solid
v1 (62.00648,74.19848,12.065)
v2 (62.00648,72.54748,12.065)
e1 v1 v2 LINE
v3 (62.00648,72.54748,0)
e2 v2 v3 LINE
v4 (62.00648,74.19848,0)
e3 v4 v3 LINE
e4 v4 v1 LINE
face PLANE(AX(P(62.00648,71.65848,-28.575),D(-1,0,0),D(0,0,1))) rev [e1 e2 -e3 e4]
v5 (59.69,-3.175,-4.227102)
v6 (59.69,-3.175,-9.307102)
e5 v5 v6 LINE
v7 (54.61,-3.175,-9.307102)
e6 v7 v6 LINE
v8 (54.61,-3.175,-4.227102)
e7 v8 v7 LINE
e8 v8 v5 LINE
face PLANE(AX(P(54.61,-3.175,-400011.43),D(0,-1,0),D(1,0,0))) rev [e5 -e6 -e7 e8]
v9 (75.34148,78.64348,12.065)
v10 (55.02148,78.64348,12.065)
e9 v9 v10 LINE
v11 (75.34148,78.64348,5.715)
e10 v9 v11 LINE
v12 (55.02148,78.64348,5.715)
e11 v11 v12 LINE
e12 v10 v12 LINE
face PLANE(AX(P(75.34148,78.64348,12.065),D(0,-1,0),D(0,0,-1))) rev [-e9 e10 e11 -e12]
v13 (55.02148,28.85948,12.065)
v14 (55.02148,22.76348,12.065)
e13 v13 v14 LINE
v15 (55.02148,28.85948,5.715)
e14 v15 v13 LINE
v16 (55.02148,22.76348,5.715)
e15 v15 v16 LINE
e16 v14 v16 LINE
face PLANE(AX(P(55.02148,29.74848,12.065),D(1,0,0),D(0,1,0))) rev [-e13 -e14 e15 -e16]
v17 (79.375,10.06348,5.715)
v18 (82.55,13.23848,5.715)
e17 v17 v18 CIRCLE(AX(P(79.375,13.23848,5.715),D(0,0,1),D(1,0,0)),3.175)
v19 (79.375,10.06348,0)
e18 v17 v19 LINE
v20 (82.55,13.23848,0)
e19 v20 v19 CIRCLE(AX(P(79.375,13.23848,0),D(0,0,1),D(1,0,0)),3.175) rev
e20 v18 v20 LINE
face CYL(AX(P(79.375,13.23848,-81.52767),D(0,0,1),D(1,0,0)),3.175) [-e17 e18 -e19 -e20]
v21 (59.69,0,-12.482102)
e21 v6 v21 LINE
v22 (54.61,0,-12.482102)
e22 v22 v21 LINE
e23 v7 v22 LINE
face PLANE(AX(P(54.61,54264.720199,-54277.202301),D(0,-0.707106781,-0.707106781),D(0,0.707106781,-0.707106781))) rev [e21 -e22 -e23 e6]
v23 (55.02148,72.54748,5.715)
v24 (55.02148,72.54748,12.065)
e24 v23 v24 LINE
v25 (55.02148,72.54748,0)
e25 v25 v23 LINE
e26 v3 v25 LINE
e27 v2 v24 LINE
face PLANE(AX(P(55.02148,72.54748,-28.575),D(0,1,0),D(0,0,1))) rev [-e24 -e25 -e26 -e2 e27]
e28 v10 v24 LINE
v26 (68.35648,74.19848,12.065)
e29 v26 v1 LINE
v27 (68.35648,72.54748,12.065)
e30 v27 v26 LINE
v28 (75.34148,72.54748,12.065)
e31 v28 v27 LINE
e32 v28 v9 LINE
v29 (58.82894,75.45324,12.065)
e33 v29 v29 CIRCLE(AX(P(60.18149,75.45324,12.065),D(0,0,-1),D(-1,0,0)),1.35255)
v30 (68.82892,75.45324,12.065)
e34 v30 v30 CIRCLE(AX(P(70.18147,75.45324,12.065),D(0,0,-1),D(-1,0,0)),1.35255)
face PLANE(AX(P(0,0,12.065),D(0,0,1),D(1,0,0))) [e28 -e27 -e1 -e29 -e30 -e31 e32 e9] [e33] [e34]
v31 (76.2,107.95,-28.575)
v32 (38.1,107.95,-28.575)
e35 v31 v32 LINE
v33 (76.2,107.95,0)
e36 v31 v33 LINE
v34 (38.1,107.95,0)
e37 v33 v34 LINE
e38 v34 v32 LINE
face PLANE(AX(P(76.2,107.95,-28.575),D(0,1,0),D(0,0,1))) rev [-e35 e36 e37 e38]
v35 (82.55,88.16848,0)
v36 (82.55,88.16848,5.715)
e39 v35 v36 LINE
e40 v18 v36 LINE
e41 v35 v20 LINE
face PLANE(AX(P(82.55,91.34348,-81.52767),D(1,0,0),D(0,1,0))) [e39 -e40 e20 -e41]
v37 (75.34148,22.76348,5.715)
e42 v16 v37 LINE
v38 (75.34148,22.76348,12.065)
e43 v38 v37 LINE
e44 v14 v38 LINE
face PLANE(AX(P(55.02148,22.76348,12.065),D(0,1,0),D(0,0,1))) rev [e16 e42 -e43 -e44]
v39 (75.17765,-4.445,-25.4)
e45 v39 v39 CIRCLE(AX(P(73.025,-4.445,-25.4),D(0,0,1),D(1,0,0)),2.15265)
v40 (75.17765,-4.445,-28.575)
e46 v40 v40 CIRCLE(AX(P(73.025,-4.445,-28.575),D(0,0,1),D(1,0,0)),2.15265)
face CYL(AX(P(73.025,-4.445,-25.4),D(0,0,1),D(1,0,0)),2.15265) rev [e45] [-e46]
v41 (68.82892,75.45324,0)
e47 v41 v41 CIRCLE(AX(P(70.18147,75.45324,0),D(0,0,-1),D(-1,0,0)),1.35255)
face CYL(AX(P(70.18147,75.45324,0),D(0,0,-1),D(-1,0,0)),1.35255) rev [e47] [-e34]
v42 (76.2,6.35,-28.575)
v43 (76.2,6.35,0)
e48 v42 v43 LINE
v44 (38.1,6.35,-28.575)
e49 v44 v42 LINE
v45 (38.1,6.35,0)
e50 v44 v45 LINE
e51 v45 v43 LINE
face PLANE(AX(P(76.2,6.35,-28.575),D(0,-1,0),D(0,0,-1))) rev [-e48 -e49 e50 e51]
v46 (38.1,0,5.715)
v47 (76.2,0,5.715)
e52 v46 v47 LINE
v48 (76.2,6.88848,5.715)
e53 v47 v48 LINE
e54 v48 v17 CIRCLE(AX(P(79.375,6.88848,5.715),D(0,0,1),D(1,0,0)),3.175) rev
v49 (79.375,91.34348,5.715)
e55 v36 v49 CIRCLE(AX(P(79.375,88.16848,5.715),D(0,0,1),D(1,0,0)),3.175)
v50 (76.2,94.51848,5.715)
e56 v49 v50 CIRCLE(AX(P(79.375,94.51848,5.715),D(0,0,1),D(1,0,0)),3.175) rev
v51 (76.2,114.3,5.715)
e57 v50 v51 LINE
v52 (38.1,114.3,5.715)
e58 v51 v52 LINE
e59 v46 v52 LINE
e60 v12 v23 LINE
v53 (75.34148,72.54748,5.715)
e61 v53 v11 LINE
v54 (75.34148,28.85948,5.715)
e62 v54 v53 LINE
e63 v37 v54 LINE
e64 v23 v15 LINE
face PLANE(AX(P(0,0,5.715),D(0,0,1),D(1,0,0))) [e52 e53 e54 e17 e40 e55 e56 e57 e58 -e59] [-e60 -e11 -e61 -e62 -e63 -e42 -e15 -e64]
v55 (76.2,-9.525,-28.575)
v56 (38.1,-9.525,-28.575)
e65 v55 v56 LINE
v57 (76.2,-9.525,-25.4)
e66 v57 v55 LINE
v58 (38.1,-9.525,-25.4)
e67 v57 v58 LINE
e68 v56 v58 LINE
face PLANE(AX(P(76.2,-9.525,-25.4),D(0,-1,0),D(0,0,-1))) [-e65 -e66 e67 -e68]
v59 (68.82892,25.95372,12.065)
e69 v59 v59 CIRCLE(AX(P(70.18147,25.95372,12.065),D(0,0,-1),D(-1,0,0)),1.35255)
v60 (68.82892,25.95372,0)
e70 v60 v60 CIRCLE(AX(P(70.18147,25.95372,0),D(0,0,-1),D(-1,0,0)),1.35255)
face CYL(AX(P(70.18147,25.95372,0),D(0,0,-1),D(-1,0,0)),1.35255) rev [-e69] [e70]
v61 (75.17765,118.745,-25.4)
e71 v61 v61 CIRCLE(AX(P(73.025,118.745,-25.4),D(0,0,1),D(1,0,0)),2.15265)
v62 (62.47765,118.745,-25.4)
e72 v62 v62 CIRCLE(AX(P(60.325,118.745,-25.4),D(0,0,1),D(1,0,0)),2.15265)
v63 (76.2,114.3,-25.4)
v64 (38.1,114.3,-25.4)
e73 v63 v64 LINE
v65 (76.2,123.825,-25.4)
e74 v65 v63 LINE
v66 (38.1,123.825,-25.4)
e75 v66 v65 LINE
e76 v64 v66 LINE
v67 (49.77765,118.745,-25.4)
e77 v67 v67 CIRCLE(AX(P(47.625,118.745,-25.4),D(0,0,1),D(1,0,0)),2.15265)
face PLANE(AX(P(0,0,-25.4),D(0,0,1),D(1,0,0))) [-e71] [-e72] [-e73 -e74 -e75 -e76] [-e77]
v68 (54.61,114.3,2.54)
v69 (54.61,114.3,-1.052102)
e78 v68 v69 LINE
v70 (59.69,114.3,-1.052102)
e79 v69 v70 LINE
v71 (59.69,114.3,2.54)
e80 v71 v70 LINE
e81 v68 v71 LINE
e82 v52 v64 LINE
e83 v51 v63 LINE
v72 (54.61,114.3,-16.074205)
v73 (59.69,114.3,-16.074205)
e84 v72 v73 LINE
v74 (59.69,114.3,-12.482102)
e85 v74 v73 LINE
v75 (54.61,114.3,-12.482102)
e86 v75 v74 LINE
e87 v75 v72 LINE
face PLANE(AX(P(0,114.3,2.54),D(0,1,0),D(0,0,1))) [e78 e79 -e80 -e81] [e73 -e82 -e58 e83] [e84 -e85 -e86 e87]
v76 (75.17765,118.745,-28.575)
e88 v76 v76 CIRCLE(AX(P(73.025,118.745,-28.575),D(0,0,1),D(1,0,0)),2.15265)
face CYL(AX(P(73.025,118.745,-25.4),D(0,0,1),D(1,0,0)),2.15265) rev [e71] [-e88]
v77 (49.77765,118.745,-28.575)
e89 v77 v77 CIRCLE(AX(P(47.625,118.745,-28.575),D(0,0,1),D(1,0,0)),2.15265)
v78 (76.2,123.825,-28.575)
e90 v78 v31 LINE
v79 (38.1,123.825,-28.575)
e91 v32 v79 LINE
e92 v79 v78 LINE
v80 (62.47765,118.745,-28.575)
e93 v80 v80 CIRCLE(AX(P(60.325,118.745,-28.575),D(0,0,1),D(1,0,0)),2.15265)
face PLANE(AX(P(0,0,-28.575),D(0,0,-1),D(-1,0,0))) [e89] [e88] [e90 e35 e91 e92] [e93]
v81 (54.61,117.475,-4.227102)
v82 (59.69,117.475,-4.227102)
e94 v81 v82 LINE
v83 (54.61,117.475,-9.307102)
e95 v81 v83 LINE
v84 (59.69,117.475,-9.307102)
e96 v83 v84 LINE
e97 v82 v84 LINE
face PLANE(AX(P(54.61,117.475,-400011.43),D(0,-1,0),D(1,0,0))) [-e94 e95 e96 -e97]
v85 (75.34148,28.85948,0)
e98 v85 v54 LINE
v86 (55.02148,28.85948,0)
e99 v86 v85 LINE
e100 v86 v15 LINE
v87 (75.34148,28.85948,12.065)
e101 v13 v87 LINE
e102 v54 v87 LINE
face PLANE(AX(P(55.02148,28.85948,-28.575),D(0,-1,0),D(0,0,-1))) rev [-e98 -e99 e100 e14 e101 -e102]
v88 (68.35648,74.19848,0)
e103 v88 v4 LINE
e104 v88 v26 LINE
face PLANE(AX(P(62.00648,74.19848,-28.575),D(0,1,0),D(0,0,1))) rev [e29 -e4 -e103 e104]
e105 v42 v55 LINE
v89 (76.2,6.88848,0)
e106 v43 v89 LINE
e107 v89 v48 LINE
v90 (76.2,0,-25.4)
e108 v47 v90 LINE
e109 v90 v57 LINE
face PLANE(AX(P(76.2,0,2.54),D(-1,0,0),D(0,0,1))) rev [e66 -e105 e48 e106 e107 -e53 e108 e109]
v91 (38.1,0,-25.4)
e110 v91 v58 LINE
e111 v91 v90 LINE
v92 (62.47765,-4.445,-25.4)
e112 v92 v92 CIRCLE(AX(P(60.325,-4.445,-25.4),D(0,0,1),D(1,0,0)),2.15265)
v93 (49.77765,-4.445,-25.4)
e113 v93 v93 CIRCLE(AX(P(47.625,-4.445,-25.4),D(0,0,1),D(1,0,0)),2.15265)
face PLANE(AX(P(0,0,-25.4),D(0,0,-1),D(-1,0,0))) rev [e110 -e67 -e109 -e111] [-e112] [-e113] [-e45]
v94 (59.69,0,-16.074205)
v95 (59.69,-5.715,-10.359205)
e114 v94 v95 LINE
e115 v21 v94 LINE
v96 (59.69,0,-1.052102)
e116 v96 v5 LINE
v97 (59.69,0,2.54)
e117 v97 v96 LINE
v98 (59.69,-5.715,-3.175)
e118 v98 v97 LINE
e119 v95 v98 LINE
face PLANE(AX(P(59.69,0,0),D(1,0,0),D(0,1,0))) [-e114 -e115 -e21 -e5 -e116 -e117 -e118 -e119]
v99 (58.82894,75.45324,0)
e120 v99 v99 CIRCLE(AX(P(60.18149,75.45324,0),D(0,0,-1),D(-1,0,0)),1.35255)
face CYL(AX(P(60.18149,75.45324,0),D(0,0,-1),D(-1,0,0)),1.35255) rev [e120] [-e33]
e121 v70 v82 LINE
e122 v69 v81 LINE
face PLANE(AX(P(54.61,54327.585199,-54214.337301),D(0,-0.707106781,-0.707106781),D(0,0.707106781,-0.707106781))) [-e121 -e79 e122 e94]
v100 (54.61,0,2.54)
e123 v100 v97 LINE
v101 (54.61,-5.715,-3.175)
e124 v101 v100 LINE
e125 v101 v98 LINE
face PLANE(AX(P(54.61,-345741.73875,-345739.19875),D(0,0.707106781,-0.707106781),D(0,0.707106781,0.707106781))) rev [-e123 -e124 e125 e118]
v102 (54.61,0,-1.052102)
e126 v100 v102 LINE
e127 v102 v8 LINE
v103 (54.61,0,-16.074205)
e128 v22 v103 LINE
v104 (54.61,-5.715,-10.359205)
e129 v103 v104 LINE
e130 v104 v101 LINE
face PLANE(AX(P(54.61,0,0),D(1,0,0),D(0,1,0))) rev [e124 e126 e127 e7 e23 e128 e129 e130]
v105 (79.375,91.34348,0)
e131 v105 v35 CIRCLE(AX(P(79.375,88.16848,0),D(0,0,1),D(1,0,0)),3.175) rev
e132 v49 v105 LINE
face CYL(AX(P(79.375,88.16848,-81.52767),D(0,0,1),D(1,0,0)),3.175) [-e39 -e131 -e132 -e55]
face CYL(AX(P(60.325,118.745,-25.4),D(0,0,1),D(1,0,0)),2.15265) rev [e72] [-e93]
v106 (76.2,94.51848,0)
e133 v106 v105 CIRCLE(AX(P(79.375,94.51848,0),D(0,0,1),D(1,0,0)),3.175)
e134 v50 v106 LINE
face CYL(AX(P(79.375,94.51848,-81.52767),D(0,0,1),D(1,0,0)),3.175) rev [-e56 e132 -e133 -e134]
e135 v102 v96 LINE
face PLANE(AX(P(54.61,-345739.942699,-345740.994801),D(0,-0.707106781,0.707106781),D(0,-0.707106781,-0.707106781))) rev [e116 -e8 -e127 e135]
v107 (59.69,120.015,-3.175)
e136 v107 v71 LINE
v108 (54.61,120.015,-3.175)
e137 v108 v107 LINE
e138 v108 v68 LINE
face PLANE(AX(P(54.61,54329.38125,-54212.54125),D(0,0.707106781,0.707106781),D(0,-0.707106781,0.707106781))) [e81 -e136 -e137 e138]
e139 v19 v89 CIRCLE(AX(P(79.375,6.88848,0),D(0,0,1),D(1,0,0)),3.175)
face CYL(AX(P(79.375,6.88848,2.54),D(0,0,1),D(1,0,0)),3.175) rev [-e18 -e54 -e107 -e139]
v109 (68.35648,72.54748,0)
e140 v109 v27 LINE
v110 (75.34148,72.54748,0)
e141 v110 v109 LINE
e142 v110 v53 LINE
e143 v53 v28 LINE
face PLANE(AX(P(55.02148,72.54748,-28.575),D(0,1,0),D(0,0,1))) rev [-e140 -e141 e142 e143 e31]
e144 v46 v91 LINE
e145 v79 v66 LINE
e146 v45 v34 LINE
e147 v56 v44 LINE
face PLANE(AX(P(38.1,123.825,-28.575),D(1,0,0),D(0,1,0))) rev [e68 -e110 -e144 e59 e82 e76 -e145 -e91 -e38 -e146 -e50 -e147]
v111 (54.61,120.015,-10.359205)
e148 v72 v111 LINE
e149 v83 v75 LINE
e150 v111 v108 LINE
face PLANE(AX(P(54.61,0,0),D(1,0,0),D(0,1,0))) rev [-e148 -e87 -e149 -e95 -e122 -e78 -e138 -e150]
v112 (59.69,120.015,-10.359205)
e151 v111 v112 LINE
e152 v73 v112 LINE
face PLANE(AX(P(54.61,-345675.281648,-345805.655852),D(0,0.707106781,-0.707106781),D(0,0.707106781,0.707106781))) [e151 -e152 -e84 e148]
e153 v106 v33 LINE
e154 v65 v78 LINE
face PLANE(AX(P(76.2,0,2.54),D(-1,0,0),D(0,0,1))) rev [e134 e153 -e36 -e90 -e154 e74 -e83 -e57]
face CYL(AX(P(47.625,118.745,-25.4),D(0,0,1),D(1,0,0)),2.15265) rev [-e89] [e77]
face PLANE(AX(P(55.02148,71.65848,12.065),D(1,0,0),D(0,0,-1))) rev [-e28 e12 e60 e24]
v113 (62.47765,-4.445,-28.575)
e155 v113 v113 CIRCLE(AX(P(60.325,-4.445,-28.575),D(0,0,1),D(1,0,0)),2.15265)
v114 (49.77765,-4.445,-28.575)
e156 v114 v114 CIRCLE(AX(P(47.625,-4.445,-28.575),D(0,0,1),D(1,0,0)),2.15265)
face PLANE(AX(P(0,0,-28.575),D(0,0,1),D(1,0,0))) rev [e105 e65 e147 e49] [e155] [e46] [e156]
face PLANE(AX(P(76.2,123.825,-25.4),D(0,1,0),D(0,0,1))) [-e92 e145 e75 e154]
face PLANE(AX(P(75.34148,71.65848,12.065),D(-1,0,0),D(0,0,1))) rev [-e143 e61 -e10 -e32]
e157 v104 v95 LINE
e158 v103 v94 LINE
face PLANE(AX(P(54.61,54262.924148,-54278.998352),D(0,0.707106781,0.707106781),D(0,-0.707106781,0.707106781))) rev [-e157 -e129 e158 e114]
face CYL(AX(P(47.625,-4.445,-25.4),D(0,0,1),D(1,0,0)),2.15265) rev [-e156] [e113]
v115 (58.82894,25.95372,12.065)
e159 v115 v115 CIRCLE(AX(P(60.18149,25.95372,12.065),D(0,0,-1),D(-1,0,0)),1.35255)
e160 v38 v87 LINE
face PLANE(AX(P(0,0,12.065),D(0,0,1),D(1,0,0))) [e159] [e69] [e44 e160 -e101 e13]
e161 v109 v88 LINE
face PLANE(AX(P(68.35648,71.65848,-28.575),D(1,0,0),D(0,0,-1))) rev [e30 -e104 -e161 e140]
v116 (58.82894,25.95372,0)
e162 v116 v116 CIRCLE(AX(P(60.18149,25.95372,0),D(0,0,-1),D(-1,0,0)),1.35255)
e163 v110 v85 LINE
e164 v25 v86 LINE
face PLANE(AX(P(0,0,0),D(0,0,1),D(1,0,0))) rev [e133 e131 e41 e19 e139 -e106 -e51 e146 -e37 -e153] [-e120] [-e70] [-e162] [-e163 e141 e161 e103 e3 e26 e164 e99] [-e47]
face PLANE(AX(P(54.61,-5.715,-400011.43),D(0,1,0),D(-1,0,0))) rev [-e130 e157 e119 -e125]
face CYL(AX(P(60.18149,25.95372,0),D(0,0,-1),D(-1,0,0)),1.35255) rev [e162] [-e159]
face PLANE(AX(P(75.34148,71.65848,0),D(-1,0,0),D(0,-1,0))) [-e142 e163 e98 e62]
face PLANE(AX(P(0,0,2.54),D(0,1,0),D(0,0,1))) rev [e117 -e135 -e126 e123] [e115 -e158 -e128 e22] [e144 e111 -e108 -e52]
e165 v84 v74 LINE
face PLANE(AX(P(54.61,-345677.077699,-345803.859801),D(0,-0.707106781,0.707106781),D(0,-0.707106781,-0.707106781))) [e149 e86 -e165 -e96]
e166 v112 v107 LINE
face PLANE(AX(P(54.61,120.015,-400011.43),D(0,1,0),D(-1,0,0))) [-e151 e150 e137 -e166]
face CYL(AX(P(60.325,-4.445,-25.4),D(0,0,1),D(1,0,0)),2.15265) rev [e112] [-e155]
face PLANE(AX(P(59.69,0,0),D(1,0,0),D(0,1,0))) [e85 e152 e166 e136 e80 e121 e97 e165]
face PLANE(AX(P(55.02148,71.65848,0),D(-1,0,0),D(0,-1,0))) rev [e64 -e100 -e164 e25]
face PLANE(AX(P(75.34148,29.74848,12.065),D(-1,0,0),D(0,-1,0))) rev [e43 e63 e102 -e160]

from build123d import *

# Parameters (mm, degrees)
SKETCH1_W             = 76.2
SKETCH1_H             = 114.3
BOSS_EXTRUDE1_DEPTH   = 2.54
SKETCH2_W             = 20.32
SKETCH2_H             = 41.91
CUT_EXTRUDE1_DEPTH    = 138.394983897
SKETCH3_W             = 76.2
SKETCH3_H             = 6.35
BOSS_EXTRUDE2_DEPTH   = 28.575
SKETCH4_W             = 76.2
SKETCH4_H             = 9.525
BOSS_EXTRUDE3_DEPTH   = 3.175
F_6_CLEARANCE_HOLE1_D = 4.3053
SKETCH9_W             = 76.2
SKETCH9_H             = 114.3
SKETCH9_W_2           = 20.32
SKETCH9_H_2           = 41.91
BOSS_EXTRUDE4_DEPTH   = 3.175
SKETCH10_W            = 38.1
SKETCH10_H            = 133.35
CUT_EXTRUDE3_DEPTH    = 150.381641191
SKETCH11_W            = 20.32
SKETCH11_H            = 6.985
BOSS_EXTRUDE5_DEPTH   = 6.35
F_6_32_TAPPED_HOLE1_D = 2.7051
SKETCH15_W            = 6.35
SKETCH15_H            = 2.54
CUT_EXTRUDE4_DEPTH    = 151.965824692
SKETCH16_W            = 20.32
SKETCH16_H            = 43.688
CUT_EXTRUDE5_DEPTH    = 151.965824692
SKETCH17_W            = 6.35
SKETCH17_H            = 81.28
BOSS_EXTRUDE6_DEPTH   = 5.715
FILLET1_START         = -28.575
FILLET1_DEPTH         = 35.575
FILLET1_2_DEPTH       = 5.715
BOSS_EXTRUDE7_START   = -19.05
BOSS_EXTRUDE7_DEPTH   = 2.54


with BuildPart() as part:
    # Sketch1 → Boss-Extrude1 (new body)
    with BuildSketch(Plane.XY):
        with Locations((38.1, 57.15)):
            Rectangle(SKETCH1_W, SKETCH1_H)
    extrude(amount=BOSS_EXTRUDE1_DEPTH)

    # Sketch2 → Cut-Extrude1 (cut, through all)
    with BuildSketch(Plane.XY.offset(2.54)):
        with Locations((65.18148, 50.70348)):
            Rectangle(SKETCH2_W, SKETCH2_H)
    extrude(amount=-CUT_EXTRUDE1_DEPTH, mode=Mode.SUBTRACT)

    # Sketch3 → Boss-Extrude2 (add)
    with BuildSketch(Plane(origin=(0, 0, 0), x_dir=(-1, 0, 0), z_dir=(0, 0, -1))):
        with Locations((-38.1, 111.125)):
            Rectangle(SKETCH3_W, SKETCH3_H)
        with Locations((-38.1, 3.175)):
            Rectangle(SKETCH3_W, SKETCH3_H)
    extrude(amount=BOSS_EXTRUDE2_DEPTH)

    # Sketch4 → Boss-Extrude3 (add)
    with BuildSketch(Plane(origin=(0, 0, -28.575), x_dir=(-1, 0, 0), z_dir=(0, 0, -1))):
        with Locations((-38.1, 119.0625)):
            Rectangle(SKETCH4_W, SKETCH4_H)
        with Locations((-38.1, -4.7625)):
            Rectangle(SKETCH4_W, SKETCH4_H)
    extrude(amount=-BOSS_EXTRUDE3_DEPTH)

    # #6 Clearance Hole1 (through all)
    with Locations(Plane.XY.offset(-25.4)):
        with Locations((9.525, 118.745), (9.525, -4.445), (22.225, -4.445), (34.925, -4.445), (47.625, -4.445), (60.325, -4.445), (22.225, 118.745), (73.025, -4.445), (34.925, 118.745), (47.625, 118.745), (60.325, 118.745), (73.025, 118.745)):
            Hole(F_6_CLEARANCE_HOLE1_D / 2)

    # Sketch9 → Boss-Extrude4 (add)
    with BuildSketch(Plane.XY.offset(2.54)):
        with Locations((38.1, 57.15)):
            Rectangle(SKETCH9_W, SKETCH9_H)
        with Locations((65.18148, 50.70348)):
            Rectangle(SKETCH9_W_2, SKETCH9_H_2, mode=Mode.SUBTRACT)
    extrude(amount=BOSS_EXTRUDE4_DEPTH)

    # Sketch10 → Cut-Extrude3 (cut, through all)
    with BuildSketch(Plane.XY.offset(5.715)):
        with Locations((19.05, 57.15)):
            Rectangle(SKETCH10_W, SKETCH10_H)
    extrude(amount=-CUT_EXTRUDE3_DEPTH, mode=Mode.SUBTRACT)

    # Sketch11 → Boss-Extrude5 (add)
    with BuildSketch(Plane.XY.offset(5.715)):
        with Locations((65.18148, 75.15098)):
            Rectangle(SKETCH11_W, SKETCH11_H)
        with Locations((65.18148, 26.25598)):
            Rectangle(SKETCH11_W, SKETCH11_H)
    extrude(amount=BOSS_EXTRUDE5_DEPTH)

    # #6-32 Tapped Hole1 (through all)
    with Locations(Plane(origin=(0, 0, 0), x_dir=(-1, 0, 0), z_dir=(0, 0, -1))):
        with Locations((-70.18147, 75.45324), (-60.18149, 75.45324), (-60.18149, 25.95372), (-70.18147, 25.95372)):
            Hole(F_6_32_TAPPED_HOLE1_D / 2)

    # Sketch15 → Cut-Extrude4 (cut, through all)
    with BuildSketch(Plane.XY.offset(12.065)):
        with Locations((65.18148, 72.92848)):
            Rectangle(SKETCH15_W, SKETCH15_H)
    extrude(amount=-CUT_EXTRUDE4_DEPTH, mode=Mode.SUBTRACT)

    # Sketch16 → Cut-Extrude5 (cut, through all)
    with BuildSketch(Plane.XY.offset(12.065)):
        with Locations((65.18148, 50.70348)):
            Rectangle(SKETCH16_W, SKETCH16_H)
    extrude(amount=-CUT_EXTRUDE5_DEPTH, mode=Mode.SUBTRACT)

    # Sketch17 → Boss-Extrude6 (add)
    with BuildSketch(Plane.XY.offset(5.715)):
        with Locations((79.375, 50.70348)):
            Rectangle(SKETCH17_W, SKETCH17_H)
    extrude(amount=-BOSS_EXTRUDE6_DEPTH)

    # Fillet1: read off the stored shape, not the designer's step
    # Fillet1 outline → Fillet1 (cut)
    with BuildSketch(Plane.XY.offset(FILLET1_START)):
        with BuildLine():
            ThreePointArc((79.375, 91.34348), (81.62006403, 90.41354403), (82.55, 88.16848))
            Line((82.55, 88.16848), (82.55, 91.34348))
            Line((82.55, 91.34348), (79.375, 91.34348))
        make_face()
        with BuildLine():
            ThreePointArc((82.55, 13.23848), (81.62006403, 10.99341597), (79.375, 10.06348))
            Line((79.375, 10.06348), (82.55, 10.06348))
            Line((82.55, 10.06348), (82.55, 13.23848))
        make_face()
    extrude(amount=FILLET1_DEPTH, mode=Mode.SUBTRACT)

    # Fillet1 2 outline → Fillet1 2 (add)
    with BuildSketch(Plane.XY):
        with BuildLine():
            Line((76.2, 91.34348), (79.375, 91.34348))
            ThreePointArc((79.375, 91.34348), (77.12993597, 92.27341597), (76.2, 94.51848))
            Line((76.2, 94.51848), (76.2, 91.34348))
        make_face()
        with BuildLine():
            ThreePointArc((76.2, 6.88848), (77.12993597, 9.13354403), (79.375, 10.06348))
            Line((79.375, 10.06348), (76.2, 10.06348))
            Line((76.2, 10.06348), (76.2, 6.88848))
        make_face()
    extrude(amount=FILLET1_2_DEPTH)

    # Sketch18 → Boss-Extrude7 (add, symmetric)
    with BuildSketch(Plane.ZY.offset(-38.1).offset(BOSS_EXTRUDE7_START)):
        Polygon((-16.074204897, 114.3), (-10.359204897, 120.015), (-3.175, 120.015), (2.54, 114.3), (-1.052102448, 114.3), (-4.227102448, 117.475), (-9.307102448, 117.475), (-12.482102448, 114.3), align=None)
    boss_extrude7 = extrude(amount=BOSS_EXTRUDE7_DEPTH, both=True)

    # Mirror1: Boss-Extrude7 across plane
    add(boss_extrude7.mirror(Plane.ZX.offset(57.15)))


solid = part.part
